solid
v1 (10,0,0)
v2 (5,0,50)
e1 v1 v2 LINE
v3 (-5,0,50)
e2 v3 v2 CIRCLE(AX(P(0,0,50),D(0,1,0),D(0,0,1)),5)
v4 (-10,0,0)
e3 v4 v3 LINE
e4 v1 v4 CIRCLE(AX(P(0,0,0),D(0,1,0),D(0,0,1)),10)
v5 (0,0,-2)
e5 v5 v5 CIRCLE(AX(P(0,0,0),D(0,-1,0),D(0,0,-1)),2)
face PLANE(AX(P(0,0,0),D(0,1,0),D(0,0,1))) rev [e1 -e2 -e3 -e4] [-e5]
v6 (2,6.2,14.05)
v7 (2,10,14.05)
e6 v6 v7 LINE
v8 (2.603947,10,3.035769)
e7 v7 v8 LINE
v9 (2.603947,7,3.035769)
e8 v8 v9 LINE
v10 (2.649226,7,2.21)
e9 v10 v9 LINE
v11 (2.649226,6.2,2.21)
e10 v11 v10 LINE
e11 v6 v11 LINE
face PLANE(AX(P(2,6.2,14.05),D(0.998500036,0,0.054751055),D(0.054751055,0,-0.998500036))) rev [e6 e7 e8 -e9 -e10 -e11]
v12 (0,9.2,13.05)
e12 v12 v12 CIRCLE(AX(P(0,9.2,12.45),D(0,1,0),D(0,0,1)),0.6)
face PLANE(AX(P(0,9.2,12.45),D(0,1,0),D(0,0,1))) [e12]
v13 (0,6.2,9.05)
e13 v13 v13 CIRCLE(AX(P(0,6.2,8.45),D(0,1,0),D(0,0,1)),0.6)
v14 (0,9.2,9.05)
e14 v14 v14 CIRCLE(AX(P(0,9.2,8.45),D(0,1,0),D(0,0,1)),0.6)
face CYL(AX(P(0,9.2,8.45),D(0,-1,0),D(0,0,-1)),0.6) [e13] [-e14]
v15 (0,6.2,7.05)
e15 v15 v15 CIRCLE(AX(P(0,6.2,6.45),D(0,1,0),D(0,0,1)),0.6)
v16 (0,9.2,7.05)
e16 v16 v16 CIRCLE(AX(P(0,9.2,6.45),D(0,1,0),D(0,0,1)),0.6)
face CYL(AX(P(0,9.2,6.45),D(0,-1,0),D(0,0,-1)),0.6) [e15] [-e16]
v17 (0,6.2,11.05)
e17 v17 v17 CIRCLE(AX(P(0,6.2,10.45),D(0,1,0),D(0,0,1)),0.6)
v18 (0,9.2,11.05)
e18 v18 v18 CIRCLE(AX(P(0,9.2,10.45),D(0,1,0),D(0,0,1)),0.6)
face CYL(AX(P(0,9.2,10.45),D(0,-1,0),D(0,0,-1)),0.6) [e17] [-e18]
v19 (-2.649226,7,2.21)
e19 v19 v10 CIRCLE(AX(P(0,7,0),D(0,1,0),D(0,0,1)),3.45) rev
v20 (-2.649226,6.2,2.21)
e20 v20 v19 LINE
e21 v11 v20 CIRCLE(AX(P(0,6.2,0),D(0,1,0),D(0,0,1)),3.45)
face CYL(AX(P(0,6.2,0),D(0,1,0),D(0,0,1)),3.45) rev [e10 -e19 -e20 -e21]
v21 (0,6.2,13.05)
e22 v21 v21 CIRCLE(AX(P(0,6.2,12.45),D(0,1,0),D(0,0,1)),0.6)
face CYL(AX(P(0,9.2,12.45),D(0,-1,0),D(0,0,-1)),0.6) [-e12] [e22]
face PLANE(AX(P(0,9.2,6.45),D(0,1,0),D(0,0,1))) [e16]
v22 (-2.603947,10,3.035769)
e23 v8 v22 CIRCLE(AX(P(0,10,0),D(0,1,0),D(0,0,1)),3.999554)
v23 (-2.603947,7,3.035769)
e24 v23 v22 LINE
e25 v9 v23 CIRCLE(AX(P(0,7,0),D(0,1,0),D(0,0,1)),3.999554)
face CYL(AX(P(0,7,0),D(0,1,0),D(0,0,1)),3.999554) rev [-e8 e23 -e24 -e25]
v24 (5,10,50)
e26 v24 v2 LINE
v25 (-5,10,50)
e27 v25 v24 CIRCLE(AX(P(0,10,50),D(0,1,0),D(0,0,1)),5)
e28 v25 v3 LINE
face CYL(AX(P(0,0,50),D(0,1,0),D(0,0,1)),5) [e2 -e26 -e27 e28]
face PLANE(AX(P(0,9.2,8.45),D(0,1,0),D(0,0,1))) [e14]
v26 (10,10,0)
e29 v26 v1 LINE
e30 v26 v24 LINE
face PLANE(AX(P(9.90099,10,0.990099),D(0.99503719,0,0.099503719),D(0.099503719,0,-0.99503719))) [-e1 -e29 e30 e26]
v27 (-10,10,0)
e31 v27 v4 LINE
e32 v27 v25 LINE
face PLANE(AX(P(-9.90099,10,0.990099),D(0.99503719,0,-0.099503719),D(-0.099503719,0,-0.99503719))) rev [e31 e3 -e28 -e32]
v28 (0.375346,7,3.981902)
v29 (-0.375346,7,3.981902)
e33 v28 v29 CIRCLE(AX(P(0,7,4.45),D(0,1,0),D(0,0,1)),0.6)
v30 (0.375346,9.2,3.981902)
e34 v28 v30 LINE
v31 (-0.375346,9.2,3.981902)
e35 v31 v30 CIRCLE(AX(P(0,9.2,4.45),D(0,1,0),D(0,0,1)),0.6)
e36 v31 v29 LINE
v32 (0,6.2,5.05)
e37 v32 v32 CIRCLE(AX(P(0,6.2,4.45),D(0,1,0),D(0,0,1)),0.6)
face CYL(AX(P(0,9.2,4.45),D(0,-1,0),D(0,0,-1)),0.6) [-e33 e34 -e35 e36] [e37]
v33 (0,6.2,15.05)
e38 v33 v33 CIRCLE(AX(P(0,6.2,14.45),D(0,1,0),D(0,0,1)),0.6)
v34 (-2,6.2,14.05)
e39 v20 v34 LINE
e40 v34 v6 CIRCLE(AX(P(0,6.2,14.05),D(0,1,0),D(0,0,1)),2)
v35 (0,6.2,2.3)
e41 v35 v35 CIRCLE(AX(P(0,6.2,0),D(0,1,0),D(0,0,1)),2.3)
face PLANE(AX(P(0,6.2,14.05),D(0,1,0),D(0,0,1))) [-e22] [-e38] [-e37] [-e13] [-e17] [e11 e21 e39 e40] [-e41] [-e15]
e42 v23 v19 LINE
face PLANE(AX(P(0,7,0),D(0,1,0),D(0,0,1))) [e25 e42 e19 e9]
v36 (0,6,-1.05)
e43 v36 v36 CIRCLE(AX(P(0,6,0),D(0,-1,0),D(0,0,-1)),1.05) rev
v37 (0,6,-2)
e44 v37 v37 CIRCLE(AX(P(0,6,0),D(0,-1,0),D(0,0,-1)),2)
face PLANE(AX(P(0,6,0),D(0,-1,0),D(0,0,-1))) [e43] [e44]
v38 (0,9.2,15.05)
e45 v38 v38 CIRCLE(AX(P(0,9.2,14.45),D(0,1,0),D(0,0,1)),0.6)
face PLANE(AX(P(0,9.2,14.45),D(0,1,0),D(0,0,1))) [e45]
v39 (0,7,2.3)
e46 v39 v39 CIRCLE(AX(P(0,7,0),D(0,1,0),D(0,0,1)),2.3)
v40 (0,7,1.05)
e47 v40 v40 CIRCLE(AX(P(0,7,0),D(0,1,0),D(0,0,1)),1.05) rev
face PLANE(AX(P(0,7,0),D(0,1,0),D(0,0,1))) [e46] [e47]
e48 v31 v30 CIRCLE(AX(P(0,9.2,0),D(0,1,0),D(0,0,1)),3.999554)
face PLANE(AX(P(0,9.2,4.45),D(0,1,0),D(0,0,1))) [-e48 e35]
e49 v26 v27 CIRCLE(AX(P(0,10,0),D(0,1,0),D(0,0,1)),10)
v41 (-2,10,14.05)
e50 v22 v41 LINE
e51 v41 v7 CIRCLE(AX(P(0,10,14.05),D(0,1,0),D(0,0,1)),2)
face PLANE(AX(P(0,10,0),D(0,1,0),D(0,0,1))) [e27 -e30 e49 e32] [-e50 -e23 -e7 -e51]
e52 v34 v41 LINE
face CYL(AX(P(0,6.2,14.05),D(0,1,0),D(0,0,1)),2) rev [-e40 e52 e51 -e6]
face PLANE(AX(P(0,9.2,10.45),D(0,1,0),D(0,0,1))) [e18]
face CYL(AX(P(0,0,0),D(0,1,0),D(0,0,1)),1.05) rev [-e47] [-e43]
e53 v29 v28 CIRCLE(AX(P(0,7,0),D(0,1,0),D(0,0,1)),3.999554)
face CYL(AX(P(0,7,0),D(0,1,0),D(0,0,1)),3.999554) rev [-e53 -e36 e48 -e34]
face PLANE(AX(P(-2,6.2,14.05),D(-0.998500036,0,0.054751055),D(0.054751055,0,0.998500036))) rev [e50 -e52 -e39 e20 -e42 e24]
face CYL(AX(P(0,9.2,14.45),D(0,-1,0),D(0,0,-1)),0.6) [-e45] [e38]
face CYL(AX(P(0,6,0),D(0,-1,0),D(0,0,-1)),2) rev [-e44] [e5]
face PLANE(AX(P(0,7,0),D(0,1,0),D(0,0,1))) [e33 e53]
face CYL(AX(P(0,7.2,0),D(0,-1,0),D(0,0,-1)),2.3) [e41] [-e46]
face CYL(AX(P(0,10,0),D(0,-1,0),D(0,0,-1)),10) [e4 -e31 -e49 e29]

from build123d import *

# Parameters (mm, degrees)
BOSS_EXTRUDE1_DEPTH = 10
CUT_EXTRUDE1_DEPTH  = 3.8
SKETCH6_R           = 2.3
BOSS_EXTRUDE2_DEPTH = 1
SKETCH7_R           = 1.05
CUT_EXTRUDE2_DEPTH  = 57.699667466
SKETCH8_R           = 0.6
BOSS_EXTRUDE3_DEPTH = 3
SKETCH9_R           = 2
CUT_EXTRUDE4_DEPTH  = 6
SKETCH10_R          = 3.99955369
CUT_EXTRUDE7_DEPTH  = 3
CUT_EXTRUDE8_DEPTH  = 58.122782589
SKETCH15_R          = 5
BOSS_EXTRUDE4_DEPTH = 10


# Read off the part's stored shape, not the designer's step: Boss-Extrude1
with BuildPart() as part:
    # Boss-Extrude1 outline → Boss-Extrude1 (new body)
    with BuildSketch(Plane(origin=(0, 0, 0), x_dir=(1, 0, 0), z_dir=(0, 1, 0))):
        with BuildLine():
            Line((5, -55.344368806), (5, -50))
            Line((5, -50), (10, 0))
            ThreePointArc((10, 0), (0, 10), (-10, 0))
            Line((-10, 0), (-5, -50))
            Line((-5, -50), (-10.000656588, -52.844368806))
            Line((-10.000656588, -52.844368806), (-10.000656588, -55.344368806))
            Line((-10.000656588, -55.344368806), (5, -55.344368806))
        make_face()
    extrude(amount=BOSS_EXTRUDE1_DEPTH)

    # Sketch5 → Cut-Extrude1 (cut)
    with BuildSketch(Plane(origin=(0, 10, 0), x_dir=(1, 0, 0), z_dir=(0, 1, 0))):
        with BuildLine():
            Line((2, -14.05), (2.649226302, -2.21))
            ThreePointArc((2.649226302, -2.21), (0, 3.45), (-2.649226302, -2.21))
            Line((-2.649226302, -2.21), (-2, -14.05))
            ThreePointArc((-2, -14.05), (0, -16.05), (2, -14.05))
        make_face()
    extrude(amount=-CUT_EXTRUDE1_DEPTH, mode=Mode.SUBTRACT)

    # Sketch6 → Boss-Extrude2 (add)
    with BuildSketch(Plane(origin=(0, 6.2, 0), x_dir=(1, 0, 0), z_dir=(0, 1, 0))):
        with Locations(Location((0, 0, 0), (0, 0, 270))):
            Circle(SKETCH6_R)
    extrude(amount=BOSS_EXTRUDE2_DEPTH)

    # Sketch7 → Cut-Extrude2 (cut, through all)
    with BuildSketch(Plane(origin=(0, 7.2, 0), x_dir=(1, 0, 0), z_dir=(0, 1, 0))):
        with Locations(Location((0, 0, 0), (0, 0, 270))):
            Circle(SKETCH7_R)
    extrude(amount=-CUT_EXTRUDE2_DEPTH, mode=Mode.SUBTRACT)

    # Sketch8 → Boss-Extrude3 (add)
    with BuildSketch(Plane(origin=(0, 6.2, 0), x_dir=(1, 0, 0), z_dir=(0, 1, 0))):
        with Locations(Location((0, -4.45, 0), (0, 0, 270))):
            Circle(SKETCH8_R)
        with Locations(Location((0, -6.45, 0), (0, 0, 270))):
            Circle(SKETCH8_R)
        with Locations(Location((0, -8.45, 0), (0, 0, 270))):
            Circle(SKETCH8_R)
        with Locations(Location((0, -10.45, 0), (0, 0, 270))):
            Circle(SKETCH8_R)
        with Locations(Location((0, -12.45, 0), (0, 0, 270))):
            Circle(SKETCH8_R)
        with Locations(Location((0, -14.45, 0), (0, 0, 270))):
            Circle(SKETCH8_R)
    extrude(amount=BOSS_EXTRUDE3_DEPTH)

    # Sketch9 → Cut-Extrude4 (cut)
    with BuildSketch(Plane.XZ):
        with Locations(Location((0, 0, 0), (0, 0, 270))):
            Circle(SKETCH9_R)
    extrude(amount=-CUT_EXTRUDE4_DEPTH, mode=Mode.SUBTRACT)

    # Sketch10 → Cut-Extrude7 (cut)
    with BuildSketch(Plane(origin=(0, 10, 0), x_dir=(1, 0, 0), z_dir=(0, 1, 0))):
        Circle(SKETCH10_R)
    extrude(amount=-CUT_EXTRUDE7_DEPTH, mode=Mode.SUBTRACT)

    # Sketch14 → Cut-Extrude8 (cut, through all)
    with BuildSketch(Plane(origin=(0, 10, 0), x_dir=(1, 0, 0), z_dir=(0, 1, 0))):
        Polygon((-5, -50), (5, -50), (5, -55.344368806), (-10.000656588, -55.344368806), (-10.000656588, -52.844368806), align=None)
    extrude(amount=-CUT_EXTRUDE8_DEPTH, mode=Mode.SUBTRACT)

    # Sketch15 → Boss-Extrude4 (add)
    with BuildSketch(Plane(origin=(0, 10, 0), x_dir=(1, 0, 0), z_dir=(0, 1, 0))):
        with Locations((0, -50)):
            Circle(SKETCH15_R)
    extrude(amount=-BOSS_EXTRUDE4_DEPTH)


solid = part.part
